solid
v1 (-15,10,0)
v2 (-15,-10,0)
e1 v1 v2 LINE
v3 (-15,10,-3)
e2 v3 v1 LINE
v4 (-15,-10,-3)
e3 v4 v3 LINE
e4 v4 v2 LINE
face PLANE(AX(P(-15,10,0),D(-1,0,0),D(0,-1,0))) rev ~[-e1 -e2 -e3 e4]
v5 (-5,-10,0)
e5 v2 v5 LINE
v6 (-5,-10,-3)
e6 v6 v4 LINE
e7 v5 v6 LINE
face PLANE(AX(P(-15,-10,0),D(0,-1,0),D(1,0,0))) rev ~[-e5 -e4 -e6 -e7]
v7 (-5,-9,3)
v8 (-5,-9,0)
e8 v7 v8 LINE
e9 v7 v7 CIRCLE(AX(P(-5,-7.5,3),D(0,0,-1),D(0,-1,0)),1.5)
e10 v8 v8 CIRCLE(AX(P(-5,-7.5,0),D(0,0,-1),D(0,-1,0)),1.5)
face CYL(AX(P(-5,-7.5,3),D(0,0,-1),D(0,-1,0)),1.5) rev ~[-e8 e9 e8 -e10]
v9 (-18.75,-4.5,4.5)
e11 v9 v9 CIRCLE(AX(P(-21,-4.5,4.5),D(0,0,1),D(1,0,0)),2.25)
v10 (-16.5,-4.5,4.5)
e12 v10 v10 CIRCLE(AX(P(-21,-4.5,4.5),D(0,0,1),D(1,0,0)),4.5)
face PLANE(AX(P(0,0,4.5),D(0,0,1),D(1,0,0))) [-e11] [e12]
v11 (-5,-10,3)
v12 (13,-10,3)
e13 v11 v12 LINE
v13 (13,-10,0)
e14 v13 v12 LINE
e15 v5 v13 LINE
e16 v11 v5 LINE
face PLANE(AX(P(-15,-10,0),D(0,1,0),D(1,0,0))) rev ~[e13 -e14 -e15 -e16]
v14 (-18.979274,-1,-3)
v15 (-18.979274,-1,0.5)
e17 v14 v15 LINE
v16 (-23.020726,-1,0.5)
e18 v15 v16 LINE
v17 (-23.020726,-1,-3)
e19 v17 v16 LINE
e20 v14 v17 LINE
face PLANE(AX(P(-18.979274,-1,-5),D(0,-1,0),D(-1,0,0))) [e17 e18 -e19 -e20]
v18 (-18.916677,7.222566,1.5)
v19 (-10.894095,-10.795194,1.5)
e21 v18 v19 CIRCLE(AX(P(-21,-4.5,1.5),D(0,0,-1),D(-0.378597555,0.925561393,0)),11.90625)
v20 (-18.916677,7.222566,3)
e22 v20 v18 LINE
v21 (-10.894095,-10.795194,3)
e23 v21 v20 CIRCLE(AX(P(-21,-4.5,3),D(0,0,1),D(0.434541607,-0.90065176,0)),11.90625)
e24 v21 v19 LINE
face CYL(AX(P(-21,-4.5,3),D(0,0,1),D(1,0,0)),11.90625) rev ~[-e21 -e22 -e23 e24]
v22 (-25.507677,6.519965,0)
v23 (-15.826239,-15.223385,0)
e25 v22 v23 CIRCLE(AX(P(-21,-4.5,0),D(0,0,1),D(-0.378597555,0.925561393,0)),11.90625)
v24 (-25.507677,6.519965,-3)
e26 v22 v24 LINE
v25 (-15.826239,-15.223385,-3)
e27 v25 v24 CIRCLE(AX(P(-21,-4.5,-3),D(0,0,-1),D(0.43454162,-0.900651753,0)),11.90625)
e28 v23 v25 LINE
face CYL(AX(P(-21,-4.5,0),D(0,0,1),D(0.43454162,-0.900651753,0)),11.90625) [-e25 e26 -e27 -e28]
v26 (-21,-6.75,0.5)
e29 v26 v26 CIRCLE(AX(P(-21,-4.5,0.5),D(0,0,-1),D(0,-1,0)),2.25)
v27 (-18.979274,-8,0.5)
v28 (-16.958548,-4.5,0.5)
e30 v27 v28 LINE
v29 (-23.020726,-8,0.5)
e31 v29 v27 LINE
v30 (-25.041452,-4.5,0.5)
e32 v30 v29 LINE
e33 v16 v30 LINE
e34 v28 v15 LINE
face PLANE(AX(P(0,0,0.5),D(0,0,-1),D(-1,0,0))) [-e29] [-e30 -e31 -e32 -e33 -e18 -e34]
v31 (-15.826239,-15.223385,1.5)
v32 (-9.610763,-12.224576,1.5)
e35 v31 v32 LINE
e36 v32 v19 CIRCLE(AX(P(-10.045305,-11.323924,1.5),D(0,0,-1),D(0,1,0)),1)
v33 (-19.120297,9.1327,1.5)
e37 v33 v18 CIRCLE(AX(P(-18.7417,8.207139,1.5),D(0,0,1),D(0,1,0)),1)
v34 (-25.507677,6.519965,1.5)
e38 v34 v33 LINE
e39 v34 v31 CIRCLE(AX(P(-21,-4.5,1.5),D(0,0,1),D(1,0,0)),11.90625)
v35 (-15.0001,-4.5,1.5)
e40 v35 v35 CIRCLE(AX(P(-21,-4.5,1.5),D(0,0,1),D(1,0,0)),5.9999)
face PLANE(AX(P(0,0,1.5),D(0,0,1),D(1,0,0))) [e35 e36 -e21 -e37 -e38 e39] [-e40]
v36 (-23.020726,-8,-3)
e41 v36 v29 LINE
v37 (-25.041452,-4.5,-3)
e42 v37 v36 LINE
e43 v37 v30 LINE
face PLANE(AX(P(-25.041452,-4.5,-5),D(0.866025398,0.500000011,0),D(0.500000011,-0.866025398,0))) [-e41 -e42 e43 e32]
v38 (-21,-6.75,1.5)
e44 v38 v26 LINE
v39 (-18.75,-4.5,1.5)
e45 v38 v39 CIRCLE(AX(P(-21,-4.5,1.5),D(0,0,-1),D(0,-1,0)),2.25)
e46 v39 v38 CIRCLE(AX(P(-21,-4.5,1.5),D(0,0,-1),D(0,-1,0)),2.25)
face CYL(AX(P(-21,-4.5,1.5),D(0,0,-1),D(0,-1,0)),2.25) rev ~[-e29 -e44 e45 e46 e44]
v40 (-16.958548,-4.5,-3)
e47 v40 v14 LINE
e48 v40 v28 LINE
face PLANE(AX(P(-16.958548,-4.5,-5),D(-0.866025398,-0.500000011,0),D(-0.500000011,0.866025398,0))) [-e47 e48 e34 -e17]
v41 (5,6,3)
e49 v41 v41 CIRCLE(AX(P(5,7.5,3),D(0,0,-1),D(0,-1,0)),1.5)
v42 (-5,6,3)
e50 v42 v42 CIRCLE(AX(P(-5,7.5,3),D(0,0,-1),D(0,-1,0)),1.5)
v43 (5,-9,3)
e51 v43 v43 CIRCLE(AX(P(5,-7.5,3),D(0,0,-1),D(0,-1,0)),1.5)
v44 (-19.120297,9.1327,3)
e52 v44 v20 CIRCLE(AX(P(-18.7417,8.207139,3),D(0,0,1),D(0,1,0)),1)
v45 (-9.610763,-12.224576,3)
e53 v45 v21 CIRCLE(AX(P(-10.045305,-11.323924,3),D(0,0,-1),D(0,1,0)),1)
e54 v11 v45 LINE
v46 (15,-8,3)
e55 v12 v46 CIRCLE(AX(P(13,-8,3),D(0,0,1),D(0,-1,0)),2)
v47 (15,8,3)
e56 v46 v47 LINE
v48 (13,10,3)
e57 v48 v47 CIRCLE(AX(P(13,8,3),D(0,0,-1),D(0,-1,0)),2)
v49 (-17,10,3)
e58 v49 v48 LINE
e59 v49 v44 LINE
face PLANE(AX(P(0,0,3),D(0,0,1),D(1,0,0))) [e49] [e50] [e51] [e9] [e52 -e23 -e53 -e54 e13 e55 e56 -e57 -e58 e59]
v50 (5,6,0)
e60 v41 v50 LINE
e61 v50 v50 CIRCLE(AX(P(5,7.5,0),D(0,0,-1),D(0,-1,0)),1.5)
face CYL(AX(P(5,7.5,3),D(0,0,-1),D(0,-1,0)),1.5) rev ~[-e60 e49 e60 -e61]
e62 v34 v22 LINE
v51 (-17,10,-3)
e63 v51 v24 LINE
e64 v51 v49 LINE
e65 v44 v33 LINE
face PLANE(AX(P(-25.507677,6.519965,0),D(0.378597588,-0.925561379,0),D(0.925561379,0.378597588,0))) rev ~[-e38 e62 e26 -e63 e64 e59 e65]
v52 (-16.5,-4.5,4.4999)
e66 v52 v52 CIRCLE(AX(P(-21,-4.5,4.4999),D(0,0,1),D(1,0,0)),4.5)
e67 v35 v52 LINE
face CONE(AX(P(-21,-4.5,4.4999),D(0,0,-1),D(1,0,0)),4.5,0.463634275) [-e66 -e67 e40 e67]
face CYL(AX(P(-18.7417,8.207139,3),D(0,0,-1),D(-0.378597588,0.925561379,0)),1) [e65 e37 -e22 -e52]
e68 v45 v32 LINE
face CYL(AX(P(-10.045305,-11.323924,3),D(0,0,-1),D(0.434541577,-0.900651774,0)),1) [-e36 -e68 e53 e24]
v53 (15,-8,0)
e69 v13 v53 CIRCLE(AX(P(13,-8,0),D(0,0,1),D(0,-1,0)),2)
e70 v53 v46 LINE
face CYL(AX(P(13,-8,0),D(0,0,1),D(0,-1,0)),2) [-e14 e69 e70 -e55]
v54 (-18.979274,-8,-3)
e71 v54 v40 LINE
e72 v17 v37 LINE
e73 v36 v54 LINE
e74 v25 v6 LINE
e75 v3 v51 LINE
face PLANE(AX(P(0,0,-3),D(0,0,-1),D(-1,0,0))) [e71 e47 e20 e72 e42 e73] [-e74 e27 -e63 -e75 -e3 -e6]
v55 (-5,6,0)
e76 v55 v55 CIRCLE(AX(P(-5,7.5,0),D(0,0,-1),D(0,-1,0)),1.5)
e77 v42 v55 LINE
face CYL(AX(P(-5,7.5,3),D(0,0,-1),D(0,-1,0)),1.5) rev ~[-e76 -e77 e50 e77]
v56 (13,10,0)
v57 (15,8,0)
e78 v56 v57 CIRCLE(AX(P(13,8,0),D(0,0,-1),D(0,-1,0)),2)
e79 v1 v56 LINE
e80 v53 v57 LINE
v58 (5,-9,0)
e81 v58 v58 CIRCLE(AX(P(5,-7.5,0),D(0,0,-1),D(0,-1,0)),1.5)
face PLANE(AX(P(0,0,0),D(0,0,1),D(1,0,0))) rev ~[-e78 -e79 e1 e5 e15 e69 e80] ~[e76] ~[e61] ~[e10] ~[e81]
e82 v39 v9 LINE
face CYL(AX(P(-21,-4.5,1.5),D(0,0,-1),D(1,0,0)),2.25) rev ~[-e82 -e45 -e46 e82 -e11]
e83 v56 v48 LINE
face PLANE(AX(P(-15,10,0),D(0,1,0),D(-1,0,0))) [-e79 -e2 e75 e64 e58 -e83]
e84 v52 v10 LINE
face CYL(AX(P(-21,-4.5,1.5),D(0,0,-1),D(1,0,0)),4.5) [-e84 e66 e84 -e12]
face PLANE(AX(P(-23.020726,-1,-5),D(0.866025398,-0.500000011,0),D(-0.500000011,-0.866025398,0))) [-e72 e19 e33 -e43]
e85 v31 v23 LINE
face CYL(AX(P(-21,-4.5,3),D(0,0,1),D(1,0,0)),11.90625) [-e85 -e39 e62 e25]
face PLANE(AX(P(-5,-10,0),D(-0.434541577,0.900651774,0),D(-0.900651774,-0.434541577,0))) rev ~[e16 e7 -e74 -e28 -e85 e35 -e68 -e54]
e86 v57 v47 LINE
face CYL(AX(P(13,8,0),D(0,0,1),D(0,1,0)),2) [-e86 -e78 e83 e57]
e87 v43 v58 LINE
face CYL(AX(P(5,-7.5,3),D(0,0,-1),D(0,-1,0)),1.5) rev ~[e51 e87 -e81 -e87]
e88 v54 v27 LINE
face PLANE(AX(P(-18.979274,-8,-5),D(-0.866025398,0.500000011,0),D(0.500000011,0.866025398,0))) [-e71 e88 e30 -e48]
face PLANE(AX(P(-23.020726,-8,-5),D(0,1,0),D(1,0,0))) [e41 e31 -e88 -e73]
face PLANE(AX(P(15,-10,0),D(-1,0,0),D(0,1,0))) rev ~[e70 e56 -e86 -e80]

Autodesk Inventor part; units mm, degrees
ref_plane "YZ Plane" through (0, 0, 0) normal (1, 0, 0) x (0, 1, 0)
ref_plane "XZ Plane" through (0, 0, 0) normal (0, 1, 0) x (-1, 0, 0)
sketch "Sketch1" plane through (0, 0, 0) normal (0, 0, 1) x (1, 0, 0)
  line L0 (-15, -10) -> (15, -10)
  line L1 (15, -10) -> (15, 10)
  line L2 (15, 10) -> (-15, 10)
  line L3 (-15, 10) -> (-15, -10)
  line L4 (-15, -10) -> (15, 10) construction
  line L5 (15, -10) -> (-15, 10) construction
  point P0 (0, 0)
  dimension "d0" = 30
  dimension "d1" = 20
extrude "Extrusion1" add sketch "Sketch1" along normal blind 3
sketch "Sketch2" plane through (0, 0, 3) normal (0, 0, 1) x (1, 0, 0)
  line L0 (-5, -7.5) -> (5, -7.5)
  line L1 (5, -7.5) -> (5, 7.5)
  line L2 (5, 7.5) -> (-5, 7.5)
  line L3 (-5, 7.5) -> (-5, -7.5)
  line L4 (-5, -7.5) -> (5, 7.5) construction
  line L5 (5, -7.5) -> (-5, 7.5) construction
  point P0 (0, 0)
  point P1 (0, 0)
  dimension "d4" = 10
  dimension "d5" = 15
hole "Hole1" at (-5, 7.5, 3) at (5, 7.5, 3) at (-5, -7.5, 3) at (5, -7.5, 3) direction (0, 0, -1) diameter 3 end through all
sketch "Sketch3" plane through (0, 0, 3) normal (0, 0, 1) x (1, 0, 0)
  line L0 (-18.979274, -1) -> (-16.958548, -4.5)
  line L1 (-16.958548, -4.5) -> (-18.979274, -8)
  line L2 (-18.979274, -8) -> (-23.020726, -8)
  line L3 (-23.020726, -8) -> (-25.041452, -4.5)
  line L4 (-25.041452, -4.5) -> (-23.020726, -1)
  line L5 (-23.020726, -1) -> (-18.979274, -1)
  circle A0 centre (-21, -4.5) radius 11.90625
  line L6 (15, -10) -> (15, 10)
  line L7 (15, 10) -> (-15, 10)
  line L8 (-15, 10) -> (-15, -10)
  line L9 (-15, -10) -> (15, -10)
  line L10 (-100, -4.5) -> (100, -4.5) construction
  line L11 (100, -4.5) -> (100, 4.5) construction
  line L12 (100, 4.5) -> (-100, 4.5) construction
  line L13 (-100, 4.5) -> (-100, -4.5) construction
  line L14 (-100, -4.5) -> (100, 4.5) construction
  line L15 (100, -4.5) -> (-100, 4.5) construction
  line L16 (-15, 10) -> (-17, 10)
  line L17 (-17, 10) -> (-25.507677, 6.519965)
  line L18 (15, -10) -> (15, -12)
  line L19 (15, -12) -> (-19.52358, -16.314354)
  line L20 (-22.587713, -1.75) -> (-19.412287, -1.75) construction
  line L21 (-19.412287, -1.75) -> (-17.824574, -4.5) construction
  line L22 (-17.824574, -4.5) -> (-19.412287, -7.25) construction
  line L23 (-19.412287, -7.25) -> (-22.587713, -7.25) construction
  line L24 (-22.587713, -7.25) -> (-24.175426, -4.5) construction
  line L25 (-24.175426, -4.5) -> (-22.587713, -1.75) construction
  circle A1 centre (-21, -4.5) radius 2 construction
  circle A2 centre (-21, -4.5) radius 1.5 construction
  line L26 (-5, -10) -> (-15.826239, -15.223385)
  point P0 (0, 0)
  point P1 (-21, -1)
  point P2 (-17.377304, -15.841731)
  point P3 (-10.440228, -10)
  point P4 (-15, 5.783909)
  point P5 (15, -11)
  dimension "d13" = 7
  dimension "d14" = 23.8125
  dimension "d15" = 9
  dimension "d16" = 200
  dimension "d19" = 4.5
  dimension "d30" = 21
  dimension "d44" = 2
  dimension "d46" = 5.5
  dimension "d47" = 4
  dimension "d48" = 0
  dimension "d49" = 3
  dimension "d73" = 20
extrude "Extrusion2" add sketch "Sketch3" against normal up to surface (3 mm away) contours L0 L1 L2 L3 L4 L5 | A0 L8 L9 | L17 L16 L8 A0 | A0 L9 L8 | A0 L9 L26
sketch "Sketch4" plane through (0, 0, 0) normal (0, 0, -1) x (-1, 0, 0)
  line L0 (-15, -10) -> (-15, 10)
  arc A0 (15.826239, -15.223385) -> (25.507677, 6.519965) centre (21, -4.5) ccw
  line L1 (-15, 10) -> (17, 10)
  line L2 (15, -10) -> (-15, -10)
  line L3 (-15, -10) -> (-15, 10)
  line L4 (-15, 10) -> (15, 10)
  line L5 (15, 10) -> (15, -10)
  line L6 (15, -10) -> (-15, 10) construction
  line L7 (-15, -10) -> (15, 10) construction
  line L8 (25.507677, 6.519965) -> (17, 10)
  line L9 (5, -10) -> (15.826239, -15.223385)
  line L10 (5, -10) -> (-15, -10)
  point P0 (0, 0)
  point P1 (15, 1.283909)
  point P2 (9.135819, -10)
extrude "Extrusion3" add sketch "Sketch4" along normal blind 3 contours L2 L5 L1 L8 A0 L9
sketch "Sketch5" plane through (0, 0, -3) normal (0, 0, -1) x (-1, 0, 0)
  arc A0 (15.826239, -15.223385) -> (25.507677, 6.519965) centre (21, -4.5) ccw
  line L0 (15, -10) -> (5, -10)
  line L1 (15, -5) -> (32.895747, -5)
  line L2 (100, -4.5) -> (-100, -4.5) construction
  line L3 (17, 10) -> (15, 10)
  line L4 (25.507677, 6.519965) -> (17, 10)
  line L5 (5, -10) -> (15.826239, -15.223385)
  line L6 (15, 10) -> (15, -10)
  point P0 (0, 0)
  dimension "d25" = 0.5
extrude "Extrusion4" add sketch "Sketch5" along normal blind 6
extrude "Extrusion5" cut sketch "Sketch3" against normal blind 1.5 contours L0 L1 L2 L3 L4 L5 | A0 L8 L9 | A0 L9 L8
fillet "Fillet1" radius 1 2 edges at (-25.5077, 6.52, 2.25) (-15.8262, -15.2234, 2.25)
sketch "Sketch6" plane through (0, 0, 1.5) normal (0, 0, 1) x (1, 0, 0)
  arc A0 (-25.507677, 6.519965) -> (-15.826239, -15.223385) centre (-21, -4.5) ccw
  arc A1 (-10.894095, -10.795194) -> (-18.916677, 7.222566) centre (-21, -4.5) ccw
  arc A2 (-19.120298, 9.1327) -> (-18.916677, 7.222566) centre (-18.7417, 8.207139) ccw
  line L0 (-19.120298, 9.1327) -> (-25.507677, 6.519965)
  line L1 (-15.826239, -15.223385) -> (-9.610763, -12.224576)
  arc A3 (-10.894095, -10.795194) -> (-9.610763, -12.224576) centre (-10.045305, -11.323924) ccw
  point P0 (0, 0)
hole "Hole2" at (-21, -4.5, 1.5) direction (0, 0, -1) diameter 4.5 depth 4
sketch "Sketch7" plane through (0, 0, -9) normal (0, 0, -1) x (-1, 0, 0)
  arc A0 (15.826239, -15.223385) -> (25.507677, 6.519965) centre (21, -4.5) ccw
  line L0 (15, -10) -> (5, -10)
  line L1 (18.979274, -1) -> (23.020726, -1)
  line L2 (23.020726, -1) -> (25.041452, -4.5)
  line L3 (25.041452, -4.5) -> (23.020726, -8)
  line L4 (23.020726, -8) -> (18.979274, -8)
  line L5 (18.979274, -8) -> (16.958548, -4.5)
  line L6 (16.958548, -4.5) -> (18.979274, -1)
  line L7 (25.507677, 6.519965) -> (17, 10)
  line L8 (17, 10) -> (15, 10)
  line L9 (5, -10) -> (15.826239, -15.223385)
  line L10 (15, 10) -> (15, -10)
  point P0 (0, 0)
  point P1 (21, -8)
  dimension "d39" = 7
extrude "Extrusion6" cut sketch "Sketch7" against normal blind 4 contours L9 L0 L10 L8 L7 A0 | L1 L2 L3 L4 L5 L6
sketch "Sketch9" plane through (0, 0, -5) normal (0, 0, -1) x (-1, 0, 0)
  arc A0 (15.826239, -15.223385) -> (25.507677, 6.519965) centre (21, -4.5) ccw
  circle A1 centre (21, -7) radius 6
  line L0 (27, -7) -> (27, -5)
  line L1 (15, -7) -> (15, -5)
  line L2 (15, -10) -> (15.803848, -10)
  line L3 (15, 10) -> (17, 10)
  line L4 (15.826239, -15.223385) -> (5, -10)
  line L5 (17, 10) -> (25.507677, 6.519965)
  line L6 (15, -10) -> (15, 10)
  line L7 (5, -10) -> (15, -10)
  point P0 (0, 0)
  dimension "d52" = 12
extrude "Extrusion8" [suppressed]
chamfer "Chamfer1" [suppressed]
sketch "Sketch11" plane through (0, 0, 1.5) normal (0, 0, 1) x (1, 0, 0)
  circle A0 centre (-21, -4.5) radius 2.25
  arc A1 (-25.507677, 6.519965) -> (-15.826239, -15.223385) centre (-21, -4.5) ccw
  arc A2 (-10.894095, -10.795194) -> (-18.916677, 7.222566) centre (-21, -4.5) ccw
  arc A3 (-19.120298, 9.1327) -> (-18.916677, 7.222566) centre (-18.7417, 8.207139) ccw
  line L0 (-19.120298, 9.1327) -> (-25.507677, 6.519965)
  circle A4 centre (-21, -4.5) radius 4.5
  line L1 (-15.826239, -15.223385) -> (-9.610763, -12.224576)
  arc A5 (-10.894095, -10.795194) -> (-9.610763, -12.224576) centre (-10.045305, -11.323924) ccw
  point P0 (0, 0)
  dimension "d61" = 9
extrude "Extrusion10" add sketch "Sketch11" along normal blind 3 contours A4
chamfer "Chamfer2" distance 1.5 distance2 3 1 edges at (-25.5, -4.5, 1.5) measured on face at (-15.1038, -11.5542, 1.5)
sketch "Sketch12" plane through (0, 0, -5) normal (0, 0, -1) x (-1, 0, 0)
  circle A0 centre (21, -4.5) radius 4.5
  line L0 (23.020726, -8) -> (18.979274, -8)
  line L1 (18.979274, -8) -> (16.958548, -4.5)
  line L2 (16.958548, -4.5) -> (18.979274, -1)
  line L3 (18.979274, -1) -> (23.020726, -1)
  line L4 (23.020726, -1) -> (25.041452, -4.5)
  line L5 (25.041452, -4.5) -> (23.020726, -8)
  point P0 (0, 0)
  point P1 (21, -8)
  dimension "d67" = 7
extrude "Extrusion11" cut sketch "Sketch12" against normal blind 5.5 contours L0 L1 L2 L3 L4 L5
sketch "Sketch13" plane through (0, 0, -5) normal (0, 0, -1) x (-1, 0, 0)
  line L0 (25.041452, -4.5) -> (23.020726, -8)
  line L1 (23.020726, -8) -> (18.979274, -8)
  line L2 (18.979274, -8) -> (16.958548, -4.5)
  arc A0 (15.826239, -15.223385) -> (25.507677, 6.519965) centre (21, -4.5) ccw
  line L3 (25.041452, -7) -> (25.041452, -5)
  line L4 (16.958548, -7) -> (16.958548, -5)
  line L5 (18.979274, -1) -> (23.020726, -1)
  line L6 (23.020726, -1) -> (25.041452, -4.5)
  line L7 (16.958548, -4.5) -> (18.979274, -1)
  line L8 (15, 10) -> (17, 10)
  line L9 (15.826239, -15.223385) -> (5, -10)
  line L10 (17, 10) -> (25.507677, 6.519965)
  line L11 (15, -10) -> (15, 10)
  line L12 (5, -10) -> (15, -10)
  point P0 (0, 0)
extrude "Extrusion12" cut sketch "Sketch13" against normal up to surface (2 mm away)
ref_plane "Work Plane1" through (0, 0, 1.35) normal (0, 0, 1) x (1, 0, 0)
fillet "Fillet4" radius 2 2 edges at (15, -10, 1.5) (15, 10, 1.5)
properties part number "UpperCarriagePivotMount" material "ABS Plastic"
